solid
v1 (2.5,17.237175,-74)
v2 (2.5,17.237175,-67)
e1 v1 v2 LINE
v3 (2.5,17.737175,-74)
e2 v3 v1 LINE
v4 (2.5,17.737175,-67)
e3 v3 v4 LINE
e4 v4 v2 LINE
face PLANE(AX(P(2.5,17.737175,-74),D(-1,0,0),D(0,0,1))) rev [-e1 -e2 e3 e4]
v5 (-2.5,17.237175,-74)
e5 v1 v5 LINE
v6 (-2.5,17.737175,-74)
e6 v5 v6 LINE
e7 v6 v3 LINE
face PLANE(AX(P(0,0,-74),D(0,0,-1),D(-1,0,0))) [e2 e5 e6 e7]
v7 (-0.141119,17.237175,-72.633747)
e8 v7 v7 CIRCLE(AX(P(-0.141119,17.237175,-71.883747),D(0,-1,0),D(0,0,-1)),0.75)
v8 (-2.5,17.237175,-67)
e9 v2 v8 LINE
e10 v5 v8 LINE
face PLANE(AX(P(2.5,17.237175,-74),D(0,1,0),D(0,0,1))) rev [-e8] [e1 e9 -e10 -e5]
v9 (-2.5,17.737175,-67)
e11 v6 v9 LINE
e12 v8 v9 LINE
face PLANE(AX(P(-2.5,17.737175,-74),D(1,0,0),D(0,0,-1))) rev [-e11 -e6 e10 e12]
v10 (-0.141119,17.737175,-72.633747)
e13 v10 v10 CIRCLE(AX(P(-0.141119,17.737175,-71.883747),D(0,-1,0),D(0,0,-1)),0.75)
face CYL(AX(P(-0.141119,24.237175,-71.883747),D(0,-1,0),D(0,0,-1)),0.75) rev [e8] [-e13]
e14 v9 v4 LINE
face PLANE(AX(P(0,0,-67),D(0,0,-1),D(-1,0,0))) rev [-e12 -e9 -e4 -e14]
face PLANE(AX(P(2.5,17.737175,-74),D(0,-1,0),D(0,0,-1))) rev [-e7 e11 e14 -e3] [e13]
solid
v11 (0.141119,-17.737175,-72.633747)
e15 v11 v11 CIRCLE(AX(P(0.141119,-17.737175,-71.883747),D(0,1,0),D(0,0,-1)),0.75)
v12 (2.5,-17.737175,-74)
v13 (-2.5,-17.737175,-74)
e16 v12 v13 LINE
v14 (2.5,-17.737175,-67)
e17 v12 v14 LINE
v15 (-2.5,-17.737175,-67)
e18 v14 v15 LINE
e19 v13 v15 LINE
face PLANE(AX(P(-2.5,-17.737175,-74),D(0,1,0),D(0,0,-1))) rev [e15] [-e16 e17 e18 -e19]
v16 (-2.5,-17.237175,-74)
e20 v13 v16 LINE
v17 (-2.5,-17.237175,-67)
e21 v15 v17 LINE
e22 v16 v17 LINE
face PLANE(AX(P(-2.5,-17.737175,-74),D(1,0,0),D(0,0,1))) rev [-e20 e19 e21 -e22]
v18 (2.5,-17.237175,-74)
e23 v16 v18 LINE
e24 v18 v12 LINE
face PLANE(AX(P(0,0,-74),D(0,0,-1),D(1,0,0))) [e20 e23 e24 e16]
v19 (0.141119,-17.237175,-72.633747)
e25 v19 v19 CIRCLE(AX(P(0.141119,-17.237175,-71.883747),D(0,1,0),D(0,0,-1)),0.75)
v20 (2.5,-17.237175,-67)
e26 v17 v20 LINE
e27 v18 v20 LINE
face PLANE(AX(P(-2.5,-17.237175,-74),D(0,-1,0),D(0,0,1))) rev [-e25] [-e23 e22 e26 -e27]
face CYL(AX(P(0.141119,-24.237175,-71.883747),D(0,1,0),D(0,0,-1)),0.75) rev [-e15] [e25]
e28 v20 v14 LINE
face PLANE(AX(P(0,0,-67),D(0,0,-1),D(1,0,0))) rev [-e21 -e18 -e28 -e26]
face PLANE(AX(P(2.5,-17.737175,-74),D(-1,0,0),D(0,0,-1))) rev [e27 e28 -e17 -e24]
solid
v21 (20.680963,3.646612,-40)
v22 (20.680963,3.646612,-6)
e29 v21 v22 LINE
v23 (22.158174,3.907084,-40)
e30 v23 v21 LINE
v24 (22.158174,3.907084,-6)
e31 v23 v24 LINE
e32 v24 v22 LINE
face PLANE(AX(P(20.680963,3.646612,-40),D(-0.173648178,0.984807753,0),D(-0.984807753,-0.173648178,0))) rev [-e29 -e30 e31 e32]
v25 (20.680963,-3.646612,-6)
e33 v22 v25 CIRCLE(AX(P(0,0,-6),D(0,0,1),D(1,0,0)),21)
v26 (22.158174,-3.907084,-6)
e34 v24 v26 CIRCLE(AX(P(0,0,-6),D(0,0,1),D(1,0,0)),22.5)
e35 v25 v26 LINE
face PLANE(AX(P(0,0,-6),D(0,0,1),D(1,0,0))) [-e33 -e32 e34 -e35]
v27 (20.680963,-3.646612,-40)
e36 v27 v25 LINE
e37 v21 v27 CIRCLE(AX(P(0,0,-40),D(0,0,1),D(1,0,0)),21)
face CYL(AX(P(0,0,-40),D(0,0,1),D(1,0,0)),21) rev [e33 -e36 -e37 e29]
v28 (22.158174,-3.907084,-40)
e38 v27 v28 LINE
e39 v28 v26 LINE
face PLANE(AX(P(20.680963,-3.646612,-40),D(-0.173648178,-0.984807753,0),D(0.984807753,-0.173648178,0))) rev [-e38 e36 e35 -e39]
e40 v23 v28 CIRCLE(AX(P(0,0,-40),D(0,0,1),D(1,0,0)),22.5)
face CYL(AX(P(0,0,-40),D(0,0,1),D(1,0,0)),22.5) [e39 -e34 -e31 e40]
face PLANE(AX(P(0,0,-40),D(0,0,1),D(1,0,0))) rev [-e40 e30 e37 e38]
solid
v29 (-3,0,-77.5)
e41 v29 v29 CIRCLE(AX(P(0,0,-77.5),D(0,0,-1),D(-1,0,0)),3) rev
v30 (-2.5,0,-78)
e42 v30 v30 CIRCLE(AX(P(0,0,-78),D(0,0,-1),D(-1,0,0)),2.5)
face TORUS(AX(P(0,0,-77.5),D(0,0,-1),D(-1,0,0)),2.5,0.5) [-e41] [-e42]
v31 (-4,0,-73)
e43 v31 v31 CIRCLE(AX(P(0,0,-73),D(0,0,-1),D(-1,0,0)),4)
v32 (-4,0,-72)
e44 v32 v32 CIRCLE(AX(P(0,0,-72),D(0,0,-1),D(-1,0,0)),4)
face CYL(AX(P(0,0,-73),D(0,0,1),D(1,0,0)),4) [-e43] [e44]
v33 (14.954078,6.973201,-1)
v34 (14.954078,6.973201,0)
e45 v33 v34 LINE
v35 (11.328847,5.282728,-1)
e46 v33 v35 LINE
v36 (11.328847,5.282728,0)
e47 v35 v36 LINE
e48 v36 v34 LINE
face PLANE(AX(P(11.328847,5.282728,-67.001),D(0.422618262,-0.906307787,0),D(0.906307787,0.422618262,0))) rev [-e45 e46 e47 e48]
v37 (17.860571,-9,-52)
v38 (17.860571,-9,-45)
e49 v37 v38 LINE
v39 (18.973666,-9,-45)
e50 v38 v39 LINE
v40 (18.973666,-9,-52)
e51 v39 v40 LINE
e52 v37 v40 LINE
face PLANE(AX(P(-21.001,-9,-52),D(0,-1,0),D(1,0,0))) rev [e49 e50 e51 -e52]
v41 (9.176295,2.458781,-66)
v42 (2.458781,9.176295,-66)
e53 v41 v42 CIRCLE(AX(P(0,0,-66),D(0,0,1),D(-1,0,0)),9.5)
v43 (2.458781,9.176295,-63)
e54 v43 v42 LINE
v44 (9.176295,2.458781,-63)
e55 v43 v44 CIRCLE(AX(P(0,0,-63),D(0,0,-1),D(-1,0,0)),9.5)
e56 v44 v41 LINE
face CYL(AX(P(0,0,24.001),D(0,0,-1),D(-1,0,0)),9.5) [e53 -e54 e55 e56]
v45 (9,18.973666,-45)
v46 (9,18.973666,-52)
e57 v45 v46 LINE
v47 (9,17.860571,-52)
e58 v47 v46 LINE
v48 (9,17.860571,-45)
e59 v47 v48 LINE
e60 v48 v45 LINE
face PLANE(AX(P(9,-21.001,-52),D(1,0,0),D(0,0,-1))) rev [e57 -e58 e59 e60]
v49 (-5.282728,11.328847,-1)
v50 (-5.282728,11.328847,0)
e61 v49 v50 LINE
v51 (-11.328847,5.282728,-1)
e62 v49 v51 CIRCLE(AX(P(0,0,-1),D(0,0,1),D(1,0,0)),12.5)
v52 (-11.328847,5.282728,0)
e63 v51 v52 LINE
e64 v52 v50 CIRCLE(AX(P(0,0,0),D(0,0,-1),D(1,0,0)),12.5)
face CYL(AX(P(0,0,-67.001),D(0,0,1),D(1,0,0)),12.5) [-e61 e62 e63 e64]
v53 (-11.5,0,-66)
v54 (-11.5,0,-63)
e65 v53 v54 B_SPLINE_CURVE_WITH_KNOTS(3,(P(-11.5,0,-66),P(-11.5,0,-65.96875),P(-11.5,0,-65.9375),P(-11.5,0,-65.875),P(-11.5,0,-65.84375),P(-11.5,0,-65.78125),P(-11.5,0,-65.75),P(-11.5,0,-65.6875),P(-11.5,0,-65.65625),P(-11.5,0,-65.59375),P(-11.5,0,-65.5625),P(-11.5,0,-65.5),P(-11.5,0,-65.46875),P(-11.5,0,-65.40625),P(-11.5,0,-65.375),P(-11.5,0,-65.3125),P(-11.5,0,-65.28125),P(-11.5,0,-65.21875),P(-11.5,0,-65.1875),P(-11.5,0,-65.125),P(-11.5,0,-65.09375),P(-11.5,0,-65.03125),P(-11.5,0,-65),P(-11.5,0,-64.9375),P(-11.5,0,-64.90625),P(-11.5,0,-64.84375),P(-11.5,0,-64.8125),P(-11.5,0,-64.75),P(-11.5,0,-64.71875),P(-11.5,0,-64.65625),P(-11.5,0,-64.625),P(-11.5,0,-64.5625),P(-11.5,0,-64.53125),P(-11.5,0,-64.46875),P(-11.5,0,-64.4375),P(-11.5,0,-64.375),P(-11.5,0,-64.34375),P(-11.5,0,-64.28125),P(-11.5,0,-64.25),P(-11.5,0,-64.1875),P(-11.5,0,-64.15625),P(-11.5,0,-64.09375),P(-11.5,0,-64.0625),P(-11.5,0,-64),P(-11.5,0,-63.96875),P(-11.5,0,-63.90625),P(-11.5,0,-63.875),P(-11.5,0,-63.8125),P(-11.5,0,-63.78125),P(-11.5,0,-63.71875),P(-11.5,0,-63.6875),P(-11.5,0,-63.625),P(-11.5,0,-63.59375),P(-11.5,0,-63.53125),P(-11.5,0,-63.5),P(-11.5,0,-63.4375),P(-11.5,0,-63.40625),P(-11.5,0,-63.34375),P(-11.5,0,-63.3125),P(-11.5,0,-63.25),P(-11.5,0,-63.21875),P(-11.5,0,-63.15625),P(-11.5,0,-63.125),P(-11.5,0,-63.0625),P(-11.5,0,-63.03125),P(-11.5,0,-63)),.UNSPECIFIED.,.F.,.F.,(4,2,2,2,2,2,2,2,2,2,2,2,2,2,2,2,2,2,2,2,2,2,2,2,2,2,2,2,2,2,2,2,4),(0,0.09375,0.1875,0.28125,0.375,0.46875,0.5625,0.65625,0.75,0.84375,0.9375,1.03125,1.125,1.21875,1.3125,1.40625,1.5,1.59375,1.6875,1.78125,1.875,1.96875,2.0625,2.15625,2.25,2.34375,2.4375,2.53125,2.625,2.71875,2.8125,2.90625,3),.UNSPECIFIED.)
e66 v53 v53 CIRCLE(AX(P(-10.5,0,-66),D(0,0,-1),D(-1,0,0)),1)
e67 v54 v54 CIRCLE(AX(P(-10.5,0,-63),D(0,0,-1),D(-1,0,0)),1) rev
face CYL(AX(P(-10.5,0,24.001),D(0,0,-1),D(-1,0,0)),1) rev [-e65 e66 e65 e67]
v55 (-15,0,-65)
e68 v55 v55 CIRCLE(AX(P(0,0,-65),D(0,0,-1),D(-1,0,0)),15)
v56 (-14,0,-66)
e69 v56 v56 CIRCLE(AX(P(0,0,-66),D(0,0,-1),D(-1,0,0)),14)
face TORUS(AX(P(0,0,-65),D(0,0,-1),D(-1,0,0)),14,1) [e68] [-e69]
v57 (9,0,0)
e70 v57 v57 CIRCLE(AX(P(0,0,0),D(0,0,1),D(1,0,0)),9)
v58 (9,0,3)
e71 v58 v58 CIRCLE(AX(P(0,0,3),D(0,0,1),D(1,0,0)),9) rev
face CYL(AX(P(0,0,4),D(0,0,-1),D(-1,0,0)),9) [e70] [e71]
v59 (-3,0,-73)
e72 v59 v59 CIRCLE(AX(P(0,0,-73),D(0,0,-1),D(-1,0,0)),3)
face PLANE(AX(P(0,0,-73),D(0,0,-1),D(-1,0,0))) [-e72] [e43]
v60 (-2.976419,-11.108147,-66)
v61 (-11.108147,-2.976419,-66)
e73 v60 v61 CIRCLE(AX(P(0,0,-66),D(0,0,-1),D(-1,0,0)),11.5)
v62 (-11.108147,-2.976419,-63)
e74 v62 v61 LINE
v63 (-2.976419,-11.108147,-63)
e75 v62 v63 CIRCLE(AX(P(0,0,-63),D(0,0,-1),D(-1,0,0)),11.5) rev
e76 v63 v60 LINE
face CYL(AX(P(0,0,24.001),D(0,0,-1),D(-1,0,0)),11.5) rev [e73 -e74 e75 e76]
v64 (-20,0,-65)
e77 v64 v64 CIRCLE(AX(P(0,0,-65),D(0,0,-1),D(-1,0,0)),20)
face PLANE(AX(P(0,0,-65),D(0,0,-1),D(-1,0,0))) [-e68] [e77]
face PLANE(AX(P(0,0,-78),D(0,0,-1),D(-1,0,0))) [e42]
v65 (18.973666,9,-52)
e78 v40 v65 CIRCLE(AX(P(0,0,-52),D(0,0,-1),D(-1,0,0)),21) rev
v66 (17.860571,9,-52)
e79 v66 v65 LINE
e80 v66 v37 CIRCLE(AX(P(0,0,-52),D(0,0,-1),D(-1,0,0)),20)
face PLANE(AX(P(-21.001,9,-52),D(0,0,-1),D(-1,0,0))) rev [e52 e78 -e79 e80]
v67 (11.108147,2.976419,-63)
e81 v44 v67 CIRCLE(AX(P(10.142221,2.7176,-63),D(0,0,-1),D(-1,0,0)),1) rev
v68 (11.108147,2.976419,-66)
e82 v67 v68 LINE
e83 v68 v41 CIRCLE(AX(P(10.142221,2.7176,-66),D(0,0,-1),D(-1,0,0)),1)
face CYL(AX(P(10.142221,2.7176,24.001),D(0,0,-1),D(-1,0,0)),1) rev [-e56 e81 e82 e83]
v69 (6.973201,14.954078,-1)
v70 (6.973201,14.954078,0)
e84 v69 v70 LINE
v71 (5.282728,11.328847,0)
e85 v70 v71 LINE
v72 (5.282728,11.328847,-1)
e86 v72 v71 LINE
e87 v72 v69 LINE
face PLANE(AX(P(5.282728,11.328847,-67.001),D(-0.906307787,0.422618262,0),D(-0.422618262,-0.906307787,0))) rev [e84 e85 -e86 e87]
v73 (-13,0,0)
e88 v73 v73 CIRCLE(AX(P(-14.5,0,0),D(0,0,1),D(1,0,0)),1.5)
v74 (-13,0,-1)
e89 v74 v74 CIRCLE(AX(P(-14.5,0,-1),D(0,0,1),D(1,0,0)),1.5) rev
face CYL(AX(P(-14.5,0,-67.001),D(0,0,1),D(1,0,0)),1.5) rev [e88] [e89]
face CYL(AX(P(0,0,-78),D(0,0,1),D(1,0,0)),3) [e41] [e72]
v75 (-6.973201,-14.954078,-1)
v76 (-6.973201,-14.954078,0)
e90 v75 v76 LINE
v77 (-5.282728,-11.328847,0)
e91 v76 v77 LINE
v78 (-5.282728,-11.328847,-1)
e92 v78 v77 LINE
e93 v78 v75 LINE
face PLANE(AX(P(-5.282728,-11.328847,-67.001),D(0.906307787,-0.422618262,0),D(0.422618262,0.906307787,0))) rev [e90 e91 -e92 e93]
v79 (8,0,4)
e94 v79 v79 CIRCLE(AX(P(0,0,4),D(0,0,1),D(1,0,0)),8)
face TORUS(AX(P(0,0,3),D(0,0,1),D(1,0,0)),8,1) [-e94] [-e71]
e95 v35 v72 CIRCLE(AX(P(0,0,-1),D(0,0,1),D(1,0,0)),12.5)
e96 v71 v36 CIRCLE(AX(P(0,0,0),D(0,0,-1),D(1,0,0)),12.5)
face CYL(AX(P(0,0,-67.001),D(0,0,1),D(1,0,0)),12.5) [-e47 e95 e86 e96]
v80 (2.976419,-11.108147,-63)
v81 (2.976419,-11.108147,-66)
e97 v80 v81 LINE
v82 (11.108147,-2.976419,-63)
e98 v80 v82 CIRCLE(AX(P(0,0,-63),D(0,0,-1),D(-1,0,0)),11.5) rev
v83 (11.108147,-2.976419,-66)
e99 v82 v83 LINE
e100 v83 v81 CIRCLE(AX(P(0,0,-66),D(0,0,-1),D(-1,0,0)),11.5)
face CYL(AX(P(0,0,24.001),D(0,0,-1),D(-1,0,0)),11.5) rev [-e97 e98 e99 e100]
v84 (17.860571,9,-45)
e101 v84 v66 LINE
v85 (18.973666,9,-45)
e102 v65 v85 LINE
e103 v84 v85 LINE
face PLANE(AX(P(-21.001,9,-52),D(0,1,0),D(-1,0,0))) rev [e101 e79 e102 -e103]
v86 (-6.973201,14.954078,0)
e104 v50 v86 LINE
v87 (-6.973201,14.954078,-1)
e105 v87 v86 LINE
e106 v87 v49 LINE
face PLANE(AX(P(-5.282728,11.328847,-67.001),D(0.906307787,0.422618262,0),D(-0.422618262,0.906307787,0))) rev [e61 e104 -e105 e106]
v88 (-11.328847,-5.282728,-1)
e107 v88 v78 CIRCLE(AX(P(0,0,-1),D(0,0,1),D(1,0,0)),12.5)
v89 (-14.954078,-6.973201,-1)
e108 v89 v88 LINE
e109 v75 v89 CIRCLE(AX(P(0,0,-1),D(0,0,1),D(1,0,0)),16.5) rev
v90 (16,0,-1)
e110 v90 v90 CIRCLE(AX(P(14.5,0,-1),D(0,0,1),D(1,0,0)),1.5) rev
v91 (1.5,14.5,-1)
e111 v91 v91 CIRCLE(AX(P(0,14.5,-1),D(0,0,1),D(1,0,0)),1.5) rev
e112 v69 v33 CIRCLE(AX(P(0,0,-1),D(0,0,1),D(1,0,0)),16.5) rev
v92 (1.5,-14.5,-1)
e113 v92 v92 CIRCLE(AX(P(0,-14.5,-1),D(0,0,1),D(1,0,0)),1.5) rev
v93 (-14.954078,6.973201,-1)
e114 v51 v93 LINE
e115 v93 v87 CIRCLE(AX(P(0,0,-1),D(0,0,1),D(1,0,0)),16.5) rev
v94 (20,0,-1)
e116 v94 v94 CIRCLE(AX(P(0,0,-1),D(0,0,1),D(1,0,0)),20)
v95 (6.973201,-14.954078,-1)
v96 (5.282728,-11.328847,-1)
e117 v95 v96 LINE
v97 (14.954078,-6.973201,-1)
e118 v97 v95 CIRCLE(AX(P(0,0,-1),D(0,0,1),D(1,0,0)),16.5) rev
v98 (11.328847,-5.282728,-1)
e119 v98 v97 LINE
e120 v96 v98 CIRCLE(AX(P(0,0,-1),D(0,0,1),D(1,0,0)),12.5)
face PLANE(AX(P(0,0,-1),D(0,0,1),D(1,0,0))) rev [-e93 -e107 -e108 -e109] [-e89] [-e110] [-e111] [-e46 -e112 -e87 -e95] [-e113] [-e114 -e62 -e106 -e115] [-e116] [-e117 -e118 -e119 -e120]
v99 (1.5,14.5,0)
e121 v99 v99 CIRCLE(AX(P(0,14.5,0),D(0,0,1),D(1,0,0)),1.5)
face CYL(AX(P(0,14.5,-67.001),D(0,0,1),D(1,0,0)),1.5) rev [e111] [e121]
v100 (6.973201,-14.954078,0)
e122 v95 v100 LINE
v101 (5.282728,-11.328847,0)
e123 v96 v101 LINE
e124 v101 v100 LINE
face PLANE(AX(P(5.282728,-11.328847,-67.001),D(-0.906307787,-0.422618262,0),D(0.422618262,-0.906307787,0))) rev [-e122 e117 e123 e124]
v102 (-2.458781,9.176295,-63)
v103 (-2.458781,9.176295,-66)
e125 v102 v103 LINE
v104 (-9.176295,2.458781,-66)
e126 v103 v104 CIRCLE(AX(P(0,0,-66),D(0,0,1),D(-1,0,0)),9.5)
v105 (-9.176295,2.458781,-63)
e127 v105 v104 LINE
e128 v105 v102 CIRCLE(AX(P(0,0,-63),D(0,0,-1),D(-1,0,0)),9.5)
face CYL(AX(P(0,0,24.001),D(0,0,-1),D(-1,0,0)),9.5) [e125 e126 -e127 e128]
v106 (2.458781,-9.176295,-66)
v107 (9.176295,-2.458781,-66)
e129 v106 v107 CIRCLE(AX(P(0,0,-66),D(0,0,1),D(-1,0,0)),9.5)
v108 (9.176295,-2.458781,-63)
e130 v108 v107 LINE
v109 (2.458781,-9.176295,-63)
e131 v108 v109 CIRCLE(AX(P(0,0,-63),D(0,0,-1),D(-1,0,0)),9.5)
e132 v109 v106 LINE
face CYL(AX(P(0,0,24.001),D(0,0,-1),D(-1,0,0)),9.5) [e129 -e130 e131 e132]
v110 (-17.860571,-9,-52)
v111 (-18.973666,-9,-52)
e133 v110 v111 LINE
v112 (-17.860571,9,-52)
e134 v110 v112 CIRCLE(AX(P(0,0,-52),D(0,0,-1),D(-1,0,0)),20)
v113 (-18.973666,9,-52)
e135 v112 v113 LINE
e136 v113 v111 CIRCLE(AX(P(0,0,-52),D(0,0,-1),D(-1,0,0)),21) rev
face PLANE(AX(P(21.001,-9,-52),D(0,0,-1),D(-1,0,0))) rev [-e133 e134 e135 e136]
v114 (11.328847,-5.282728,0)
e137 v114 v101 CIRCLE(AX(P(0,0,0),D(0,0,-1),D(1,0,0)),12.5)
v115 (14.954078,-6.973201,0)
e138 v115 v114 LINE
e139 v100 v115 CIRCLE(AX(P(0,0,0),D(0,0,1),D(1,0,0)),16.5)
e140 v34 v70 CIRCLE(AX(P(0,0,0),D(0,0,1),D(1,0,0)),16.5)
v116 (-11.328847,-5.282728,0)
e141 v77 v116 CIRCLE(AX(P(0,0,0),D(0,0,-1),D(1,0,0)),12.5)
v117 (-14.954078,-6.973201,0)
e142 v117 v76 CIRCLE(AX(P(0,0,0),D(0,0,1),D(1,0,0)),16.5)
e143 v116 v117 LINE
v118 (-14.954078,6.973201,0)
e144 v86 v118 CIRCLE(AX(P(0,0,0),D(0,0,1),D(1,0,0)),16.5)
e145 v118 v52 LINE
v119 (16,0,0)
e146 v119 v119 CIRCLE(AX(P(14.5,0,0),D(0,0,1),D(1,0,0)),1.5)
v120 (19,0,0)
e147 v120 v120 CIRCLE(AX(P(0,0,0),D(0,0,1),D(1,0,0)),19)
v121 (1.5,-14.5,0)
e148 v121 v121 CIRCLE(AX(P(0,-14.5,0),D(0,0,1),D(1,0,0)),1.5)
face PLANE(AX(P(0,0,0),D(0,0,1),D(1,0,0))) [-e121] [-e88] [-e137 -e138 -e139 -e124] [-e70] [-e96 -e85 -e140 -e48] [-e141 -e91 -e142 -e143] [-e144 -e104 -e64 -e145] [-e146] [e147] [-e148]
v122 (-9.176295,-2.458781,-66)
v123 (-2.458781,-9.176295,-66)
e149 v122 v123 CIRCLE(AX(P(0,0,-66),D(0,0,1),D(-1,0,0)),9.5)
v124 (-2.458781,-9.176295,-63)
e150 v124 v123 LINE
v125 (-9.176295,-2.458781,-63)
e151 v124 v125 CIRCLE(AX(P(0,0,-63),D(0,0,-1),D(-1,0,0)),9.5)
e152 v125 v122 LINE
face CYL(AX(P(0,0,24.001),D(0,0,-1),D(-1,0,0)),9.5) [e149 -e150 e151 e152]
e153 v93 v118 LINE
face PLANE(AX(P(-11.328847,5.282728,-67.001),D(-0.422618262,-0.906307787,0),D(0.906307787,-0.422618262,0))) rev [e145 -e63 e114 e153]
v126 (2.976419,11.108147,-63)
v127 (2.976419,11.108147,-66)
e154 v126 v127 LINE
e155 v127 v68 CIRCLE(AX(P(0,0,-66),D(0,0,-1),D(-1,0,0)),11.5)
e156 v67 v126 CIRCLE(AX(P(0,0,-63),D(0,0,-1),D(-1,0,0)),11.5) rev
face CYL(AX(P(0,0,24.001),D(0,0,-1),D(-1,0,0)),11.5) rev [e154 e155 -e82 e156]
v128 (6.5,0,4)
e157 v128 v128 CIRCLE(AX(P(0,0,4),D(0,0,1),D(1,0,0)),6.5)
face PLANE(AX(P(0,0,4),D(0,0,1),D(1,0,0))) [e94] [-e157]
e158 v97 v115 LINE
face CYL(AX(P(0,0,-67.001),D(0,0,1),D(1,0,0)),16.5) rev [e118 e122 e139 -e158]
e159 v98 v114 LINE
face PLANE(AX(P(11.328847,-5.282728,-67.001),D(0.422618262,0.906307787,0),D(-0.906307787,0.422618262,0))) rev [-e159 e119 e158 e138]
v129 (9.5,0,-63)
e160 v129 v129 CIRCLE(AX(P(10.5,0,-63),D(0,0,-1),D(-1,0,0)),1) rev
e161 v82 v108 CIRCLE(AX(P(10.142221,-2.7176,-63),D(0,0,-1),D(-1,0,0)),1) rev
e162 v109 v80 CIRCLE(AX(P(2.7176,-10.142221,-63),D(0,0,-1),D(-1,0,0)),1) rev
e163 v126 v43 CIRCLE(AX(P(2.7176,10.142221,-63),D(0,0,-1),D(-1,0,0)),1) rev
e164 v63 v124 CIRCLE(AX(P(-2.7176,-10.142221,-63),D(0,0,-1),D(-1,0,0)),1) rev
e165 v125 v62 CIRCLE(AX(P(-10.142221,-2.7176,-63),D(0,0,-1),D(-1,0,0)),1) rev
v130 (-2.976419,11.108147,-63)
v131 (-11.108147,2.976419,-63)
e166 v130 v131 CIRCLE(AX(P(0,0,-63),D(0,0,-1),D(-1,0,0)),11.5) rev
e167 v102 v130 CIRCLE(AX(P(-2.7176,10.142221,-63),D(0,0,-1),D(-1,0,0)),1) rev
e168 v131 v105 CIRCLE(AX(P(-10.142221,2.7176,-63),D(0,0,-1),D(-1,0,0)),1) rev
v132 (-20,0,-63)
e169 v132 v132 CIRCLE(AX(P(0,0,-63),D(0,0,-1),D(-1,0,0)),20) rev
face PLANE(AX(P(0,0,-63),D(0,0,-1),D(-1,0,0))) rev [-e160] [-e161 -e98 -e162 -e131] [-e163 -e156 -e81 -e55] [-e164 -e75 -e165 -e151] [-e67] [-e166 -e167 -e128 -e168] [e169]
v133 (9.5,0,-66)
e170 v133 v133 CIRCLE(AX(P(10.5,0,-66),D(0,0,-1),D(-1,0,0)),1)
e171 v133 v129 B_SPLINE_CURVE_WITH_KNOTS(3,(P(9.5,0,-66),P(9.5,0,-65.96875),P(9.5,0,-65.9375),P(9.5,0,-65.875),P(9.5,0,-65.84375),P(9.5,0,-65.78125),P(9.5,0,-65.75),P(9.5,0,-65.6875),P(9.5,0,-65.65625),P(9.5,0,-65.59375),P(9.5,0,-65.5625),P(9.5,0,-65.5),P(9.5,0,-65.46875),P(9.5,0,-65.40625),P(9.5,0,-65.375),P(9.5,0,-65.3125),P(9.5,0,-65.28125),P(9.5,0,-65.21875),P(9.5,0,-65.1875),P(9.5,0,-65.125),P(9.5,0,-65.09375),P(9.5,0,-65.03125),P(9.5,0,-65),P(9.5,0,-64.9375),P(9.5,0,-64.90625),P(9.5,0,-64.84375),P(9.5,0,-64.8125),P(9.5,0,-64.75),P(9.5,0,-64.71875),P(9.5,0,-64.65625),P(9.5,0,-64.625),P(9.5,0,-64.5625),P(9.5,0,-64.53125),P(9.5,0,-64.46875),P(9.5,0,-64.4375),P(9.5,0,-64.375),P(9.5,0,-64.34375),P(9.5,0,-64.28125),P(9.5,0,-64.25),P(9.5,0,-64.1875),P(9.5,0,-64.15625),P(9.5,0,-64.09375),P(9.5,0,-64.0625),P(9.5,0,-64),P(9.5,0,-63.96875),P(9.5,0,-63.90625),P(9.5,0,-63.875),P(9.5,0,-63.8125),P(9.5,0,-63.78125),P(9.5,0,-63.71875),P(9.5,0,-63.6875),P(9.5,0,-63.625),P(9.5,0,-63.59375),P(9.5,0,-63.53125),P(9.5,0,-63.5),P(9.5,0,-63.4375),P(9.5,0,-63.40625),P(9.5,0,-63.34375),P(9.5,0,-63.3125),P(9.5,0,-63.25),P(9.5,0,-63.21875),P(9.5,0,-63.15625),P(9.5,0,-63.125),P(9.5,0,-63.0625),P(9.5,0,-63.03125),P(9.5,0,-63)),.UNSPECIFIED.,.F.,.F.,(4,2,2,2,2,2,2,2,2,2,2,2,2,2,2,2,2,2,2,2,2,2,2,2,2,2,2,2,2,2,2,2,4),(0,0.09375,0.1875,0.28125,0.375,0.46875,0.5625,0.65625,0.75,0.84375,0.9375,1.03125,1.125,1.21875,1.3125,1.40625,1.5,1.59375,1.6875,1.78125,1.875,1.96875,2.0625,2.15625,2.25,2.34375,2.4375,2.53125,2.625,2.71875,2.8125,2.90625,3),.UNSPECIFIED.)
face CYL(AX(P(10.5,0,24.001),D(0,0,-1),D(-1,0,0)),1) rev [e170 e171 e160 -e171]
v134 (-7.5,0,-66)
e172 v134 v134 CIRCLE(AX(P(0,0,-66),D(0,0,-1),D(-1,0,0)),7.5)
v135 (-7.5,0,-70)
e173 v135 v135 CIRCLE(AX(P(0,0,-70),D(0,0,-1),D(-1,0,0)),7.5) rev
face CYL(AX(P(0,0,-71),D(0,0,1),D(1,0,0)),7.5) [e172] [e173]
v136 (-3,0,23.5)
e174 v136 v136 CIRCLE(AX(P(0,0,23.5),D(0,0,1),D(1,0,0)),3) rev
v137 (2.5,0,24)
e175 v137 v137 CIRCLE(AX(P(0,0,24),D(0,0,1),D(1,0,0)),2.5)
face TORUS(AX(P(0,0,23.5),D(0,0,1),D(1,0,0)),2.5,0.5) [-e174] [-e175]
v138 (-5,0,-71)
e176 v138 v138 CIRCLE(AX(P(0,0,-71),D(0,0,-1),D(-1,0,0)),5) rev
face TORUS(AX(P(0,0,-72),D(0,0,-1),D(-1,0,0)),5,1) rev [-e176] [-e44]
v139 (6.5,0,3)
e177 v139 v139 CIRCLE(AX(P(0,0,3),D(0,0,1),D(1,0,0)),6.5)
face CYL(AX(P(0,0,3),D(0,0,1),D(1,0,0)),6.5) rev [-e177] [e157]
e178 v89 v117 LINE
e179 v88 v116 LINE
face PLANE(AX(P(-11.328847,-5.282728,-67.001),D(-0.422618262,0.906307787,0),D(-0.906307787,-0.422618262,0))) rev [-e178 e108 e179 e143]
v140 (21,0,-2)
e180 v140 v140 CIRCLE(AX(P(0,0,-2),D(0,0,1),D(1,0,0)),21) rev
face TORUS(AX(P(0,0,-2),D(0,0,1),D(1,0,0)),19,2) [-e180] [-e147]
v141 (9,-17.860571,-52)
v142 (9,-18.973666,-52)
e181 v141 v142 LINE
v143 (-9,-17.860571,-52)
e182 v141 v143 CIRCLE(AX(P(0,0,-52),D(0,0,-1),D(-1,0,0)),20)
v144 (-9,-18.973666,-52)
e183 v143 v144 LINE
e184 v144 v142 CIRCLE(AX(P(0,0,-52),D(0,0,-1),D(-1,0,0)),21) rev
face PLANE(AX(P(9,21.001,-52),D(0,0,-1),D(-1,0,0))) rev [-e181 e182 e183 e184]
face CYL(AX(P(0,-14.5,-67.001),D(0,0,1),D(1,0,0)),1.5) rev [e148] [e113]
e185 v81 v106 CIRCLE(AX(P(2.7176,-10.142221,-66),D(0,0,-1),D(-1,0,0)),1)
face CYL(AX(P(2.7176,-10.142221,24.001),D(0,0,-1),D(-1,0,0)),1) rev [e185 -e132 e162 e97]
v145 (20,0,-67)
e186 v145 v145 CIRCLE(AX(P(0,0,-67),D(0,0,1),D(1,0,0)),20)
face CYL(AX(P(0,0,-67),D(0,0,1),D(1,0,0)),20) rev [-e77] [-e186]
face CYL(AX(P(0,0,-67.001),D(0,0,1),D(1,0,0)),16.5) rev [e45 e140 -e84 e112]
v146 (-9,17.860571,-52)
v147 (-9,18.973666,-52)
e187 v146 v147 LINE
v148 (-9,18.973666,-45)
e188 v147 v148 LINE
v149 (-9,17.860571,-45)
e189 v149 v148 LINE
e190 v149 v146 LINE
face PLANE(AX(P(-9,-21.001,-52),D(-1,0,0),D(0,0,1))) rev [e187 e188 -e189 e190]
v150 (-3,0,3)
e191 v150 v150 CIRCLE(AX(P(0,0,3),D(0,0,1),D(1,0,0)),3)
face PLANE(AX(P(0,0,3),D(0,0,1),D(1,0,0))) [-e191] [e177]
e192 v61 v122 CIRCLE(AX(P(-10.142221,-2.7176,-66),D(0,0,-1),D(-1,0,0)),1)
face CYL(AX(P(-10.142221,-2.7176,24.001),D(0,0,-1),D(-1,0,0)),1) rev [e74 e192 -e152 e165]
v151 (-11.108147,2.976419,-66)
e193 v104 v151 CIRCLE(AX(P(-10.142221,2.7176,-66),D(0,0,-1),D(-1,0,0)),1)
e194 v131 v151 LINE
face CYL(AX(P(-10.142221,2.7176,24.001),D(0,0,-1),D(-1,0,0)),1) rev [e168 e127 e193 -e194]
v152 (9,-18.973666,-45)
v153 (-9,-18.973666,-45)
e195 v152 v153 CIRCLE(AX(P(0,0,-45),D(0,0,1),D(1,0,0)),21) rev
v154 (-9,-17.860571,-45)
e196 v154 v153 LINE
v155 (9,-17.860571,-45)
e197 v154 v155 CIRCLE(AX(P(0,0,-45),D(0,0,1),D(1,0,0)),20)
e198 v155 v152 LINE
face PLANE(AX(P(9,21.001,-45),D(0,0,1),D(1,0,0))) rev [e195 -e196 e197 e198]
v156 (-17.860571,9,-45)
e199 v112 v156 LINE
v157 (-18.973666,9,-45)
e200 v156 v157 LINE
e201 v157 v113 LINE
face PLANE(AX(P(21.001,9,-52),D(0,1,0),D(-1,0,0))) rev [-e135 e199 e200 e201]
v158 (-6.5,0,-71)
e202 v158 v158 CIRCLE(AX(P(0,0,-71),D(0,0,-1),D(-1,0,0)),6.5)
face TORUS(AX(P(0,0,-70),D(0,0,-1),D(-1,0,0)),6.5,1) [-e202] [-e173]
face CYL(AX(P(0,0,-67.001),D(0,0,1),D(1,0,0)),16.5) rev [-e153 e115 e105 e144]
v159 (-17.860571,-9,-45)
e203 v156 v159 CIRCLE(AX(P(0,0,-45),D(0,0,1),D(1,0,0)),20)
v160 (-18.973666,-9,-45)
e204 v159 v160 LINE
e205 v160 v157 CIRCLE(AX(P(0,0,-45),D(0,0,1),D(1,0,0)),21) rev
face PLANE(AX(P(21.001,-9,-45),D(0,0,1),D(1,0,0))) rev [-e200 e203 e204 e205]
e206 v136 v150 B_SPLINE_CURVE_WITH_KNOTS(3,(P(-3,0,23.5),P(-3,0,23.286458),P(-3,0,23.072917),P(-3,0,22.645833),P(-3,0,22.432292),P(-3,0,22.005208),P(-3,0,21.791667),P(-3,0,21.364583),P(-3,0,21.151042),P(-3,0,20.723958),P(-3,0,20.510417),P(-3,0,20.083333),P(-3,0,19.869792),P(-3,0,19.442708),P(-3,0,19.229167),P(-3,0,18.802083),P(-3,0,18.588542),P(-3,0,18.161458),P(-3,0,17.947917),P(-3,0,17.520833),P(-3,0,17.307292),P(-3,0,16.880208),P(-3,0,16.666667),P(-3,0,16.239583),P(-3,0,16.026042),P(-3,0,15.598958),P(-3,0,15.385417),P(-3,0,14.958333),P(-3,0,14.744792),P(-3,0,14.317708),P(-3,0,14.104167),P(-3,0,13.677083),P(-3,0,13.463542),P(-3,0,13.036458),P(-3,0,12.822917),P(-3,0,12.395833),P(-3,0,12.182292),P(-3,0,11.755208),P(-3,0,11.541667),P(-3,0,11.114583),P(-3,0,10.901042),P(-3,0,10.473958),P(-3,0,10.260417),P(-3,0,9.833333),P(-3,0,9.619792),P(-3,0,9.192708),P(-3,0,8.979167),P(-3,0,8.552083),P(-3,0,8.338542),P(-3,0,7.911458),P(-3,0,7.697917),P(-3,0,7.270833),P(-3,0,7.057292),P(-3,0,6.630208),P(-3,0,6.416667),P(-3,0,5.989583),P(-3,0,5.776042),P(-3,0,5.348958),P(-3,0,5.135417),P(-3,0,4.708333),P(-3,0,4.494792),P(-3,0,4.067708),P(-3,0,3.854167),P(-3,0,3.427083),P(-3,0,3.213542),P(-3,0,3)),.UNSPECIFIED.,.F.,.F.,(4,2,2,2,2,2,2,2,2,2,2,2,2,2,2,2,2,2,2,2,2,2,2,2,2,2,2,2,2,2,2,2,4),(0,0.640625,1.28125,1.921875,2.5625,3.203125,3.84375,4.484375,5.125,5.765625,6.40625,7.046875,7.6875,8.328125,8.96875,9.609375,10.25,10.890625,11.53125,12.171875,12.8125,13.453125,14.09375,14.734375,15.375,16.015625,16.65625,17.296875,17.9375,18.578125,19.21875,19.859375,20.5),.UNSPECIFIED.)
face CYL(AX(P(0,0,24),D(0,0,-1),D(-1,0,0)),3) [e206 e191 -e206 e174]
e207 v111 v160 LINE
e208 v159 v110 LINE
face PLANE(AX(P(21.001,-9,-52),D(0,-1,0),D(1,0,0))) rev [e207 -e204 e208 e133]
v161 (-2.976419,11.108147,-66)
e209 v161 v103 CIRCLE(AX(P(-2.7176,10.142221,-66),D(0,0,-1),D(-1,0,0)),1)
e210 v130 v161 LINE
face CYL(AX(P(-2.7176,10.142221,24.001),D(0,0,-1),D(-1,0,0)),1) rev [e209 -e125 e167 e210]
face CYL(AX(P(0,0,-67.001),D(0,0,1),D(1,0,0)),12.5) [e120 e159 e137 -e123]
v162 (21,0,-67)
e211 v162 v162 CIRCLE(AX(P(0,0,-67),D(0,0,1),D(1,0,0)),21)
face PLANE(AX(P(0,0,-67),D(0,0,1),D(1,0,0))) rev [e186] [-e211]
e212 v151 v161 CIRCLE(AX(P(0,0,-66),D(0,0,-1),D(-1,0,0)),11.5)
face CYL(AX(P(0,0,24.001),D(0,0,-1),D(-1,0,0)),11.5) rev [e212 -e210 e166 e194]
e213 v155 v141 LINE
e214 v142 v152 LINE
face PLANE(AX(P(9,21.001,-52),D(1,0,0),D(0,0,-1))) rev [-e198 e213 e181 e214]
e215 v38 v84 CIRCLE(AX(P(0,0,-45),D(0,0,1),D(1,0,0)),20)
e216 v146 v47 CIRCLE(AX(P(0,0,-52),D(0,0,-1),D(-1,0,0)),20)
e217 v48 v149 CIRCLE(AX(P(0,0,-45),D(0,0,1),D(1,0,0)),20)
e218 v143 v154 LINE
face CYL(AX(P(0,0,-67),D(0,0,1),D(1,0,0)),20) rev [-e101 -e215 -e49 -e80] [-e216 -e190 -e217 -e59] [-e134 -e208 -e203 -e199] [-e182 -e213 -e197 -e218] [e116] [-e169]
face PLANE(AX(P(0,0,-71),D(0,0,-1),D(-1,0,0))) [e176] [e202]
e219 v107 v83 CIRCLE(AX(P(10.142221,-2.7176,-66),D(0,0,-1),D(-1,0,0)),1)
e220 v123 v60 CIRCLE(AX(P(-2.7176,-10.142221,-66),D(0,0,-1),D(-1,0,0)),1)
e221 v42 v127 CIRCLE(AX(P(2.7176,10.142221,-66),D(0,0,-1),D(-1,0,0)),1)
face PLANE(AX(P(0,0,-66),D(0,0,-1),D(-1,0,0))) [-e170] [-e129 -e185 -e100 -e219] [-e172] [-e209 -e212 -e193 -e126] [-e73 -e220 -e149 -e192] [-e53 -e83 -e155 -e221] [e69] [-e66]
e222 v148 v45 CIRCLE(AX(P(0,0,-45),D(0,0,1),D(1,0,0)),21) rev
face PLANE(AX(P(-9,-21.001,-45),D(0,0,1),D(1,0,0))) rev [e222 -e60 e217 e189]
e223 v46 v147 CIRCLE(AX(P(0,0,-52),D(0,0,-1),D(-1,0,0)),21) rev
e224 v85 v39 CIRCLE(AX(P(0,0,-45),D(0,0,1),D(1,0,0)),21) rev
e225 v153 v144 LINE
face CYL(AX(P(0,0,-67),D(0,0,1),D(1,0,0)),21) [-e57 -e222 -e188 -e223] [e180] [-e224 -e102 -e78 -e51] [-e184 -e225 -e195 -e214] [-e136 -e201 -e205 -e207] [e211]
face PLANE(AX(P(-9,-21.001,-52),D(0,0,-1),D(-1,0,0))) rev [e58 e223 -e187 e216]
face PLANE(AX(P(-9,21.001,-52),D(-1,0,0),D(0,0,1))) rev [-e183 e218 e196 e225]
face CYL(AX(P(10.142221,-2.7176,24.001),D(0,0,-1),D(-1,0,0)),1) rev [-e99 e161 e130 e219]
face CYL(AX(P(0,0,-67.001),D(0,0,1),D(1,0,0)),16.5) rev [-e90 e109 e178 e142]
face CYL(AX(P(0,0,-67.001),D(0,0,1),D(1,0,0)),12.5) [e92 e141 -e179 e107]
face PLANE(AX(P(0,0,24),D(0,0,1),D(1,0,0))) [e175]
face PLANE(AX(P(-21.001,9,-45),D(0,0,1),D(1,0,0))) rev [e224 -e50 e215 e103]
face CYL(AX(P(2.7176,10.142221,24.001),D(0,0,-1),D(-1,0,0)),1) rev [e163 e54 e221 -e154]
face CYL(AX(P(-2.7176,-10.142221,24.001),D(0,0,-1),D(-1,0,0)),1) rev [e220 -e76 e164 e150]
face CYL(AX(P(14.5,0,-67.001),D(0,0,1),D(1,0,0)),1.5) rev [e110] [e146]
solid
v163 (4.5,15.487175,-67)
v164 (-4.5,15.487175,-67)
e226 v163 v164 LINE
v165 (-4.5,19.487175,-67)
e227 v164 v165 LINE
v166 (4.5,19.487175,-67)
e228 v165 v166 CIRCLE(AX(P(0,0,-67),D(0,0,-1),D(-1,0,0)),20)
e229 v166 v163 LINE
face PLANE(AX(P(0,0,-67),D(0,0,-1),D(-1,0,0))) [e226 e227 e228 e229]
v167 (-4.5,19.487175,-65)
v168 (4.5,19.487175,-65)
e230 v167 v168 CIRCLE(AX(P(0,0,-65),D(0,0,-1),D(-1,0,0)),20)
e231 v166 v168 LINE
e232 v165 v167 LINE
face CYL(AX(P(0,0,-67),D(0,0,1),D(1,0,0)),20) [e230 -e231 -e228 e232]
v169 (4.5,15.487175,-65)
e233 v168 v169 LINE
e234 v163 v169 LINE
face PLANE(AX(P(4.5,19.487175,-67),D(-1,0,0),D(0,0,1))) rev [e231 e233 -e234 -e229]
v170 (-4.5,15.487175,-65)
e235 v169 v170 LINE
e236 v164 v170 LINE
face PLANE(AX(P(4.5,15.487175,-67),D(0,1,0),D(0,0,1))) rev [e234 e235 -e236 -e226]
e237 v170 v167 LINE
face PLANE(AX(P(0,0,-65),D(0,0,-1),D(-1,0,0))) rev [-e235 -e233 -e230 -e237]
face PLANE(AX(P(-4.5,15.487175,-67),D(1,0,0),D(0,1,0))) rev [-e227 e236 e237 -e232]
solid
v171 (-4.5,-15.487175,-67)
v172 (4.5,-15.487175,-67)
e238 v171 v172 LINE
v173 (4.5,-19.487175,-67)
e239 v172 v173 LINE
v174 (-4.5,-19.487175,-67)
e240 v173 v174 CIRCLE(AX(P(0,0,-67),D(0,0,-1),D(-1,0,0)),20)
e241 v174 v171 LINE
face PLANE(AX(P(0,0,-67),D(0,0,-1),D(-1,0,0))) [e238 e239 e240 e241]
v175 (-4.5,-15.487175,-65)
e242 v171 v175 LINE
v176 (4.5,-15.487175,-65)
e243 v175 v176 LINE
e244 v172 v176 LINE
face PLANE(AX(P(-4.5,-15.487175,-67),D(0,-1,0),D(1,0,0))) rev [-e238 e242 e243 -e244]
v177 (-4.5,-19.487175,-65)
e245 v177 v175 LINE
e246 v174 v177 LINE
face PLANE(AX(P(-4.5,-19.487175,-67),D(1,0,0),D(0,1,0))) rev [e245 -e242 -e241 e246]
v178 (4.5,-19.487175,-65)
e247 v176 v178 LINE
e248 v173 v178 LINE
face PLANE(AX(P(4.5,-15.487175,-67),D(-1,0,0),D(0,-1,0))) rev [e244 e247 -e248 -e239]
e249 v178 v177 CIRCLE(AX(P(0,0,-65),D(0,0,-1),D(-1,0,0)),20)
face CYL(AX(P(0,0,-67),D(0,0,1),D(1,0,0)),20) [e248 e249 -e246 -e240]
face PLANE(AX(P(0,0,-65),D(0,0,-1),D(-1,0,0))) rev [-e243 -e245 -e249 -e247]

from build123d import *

# Parameters (mm, degrees)
SKETCH1_R               = 21
BOSS_EXTRUDE1_DEPTH     = 67
SHELL1_T                = -1
FILLET1_R               = 2
CUT_EXTRUDE1_REACH      = 75.287
SKETCH2_R               = 1.5
SKETCH3_R               = 9
BOSS_EXTRUDE2_DEPTH     = 4
FILLET2_R               = 1
SKETCH4_R               = 6.5
CUT_EXTRUDE2_DEPTH      = 1
SKETCH5_R               = 3
BOSS_EXTRUDE3_DEPTH     = 21
FILLET3_R               = 0.5
CUT_EXTRUDE3_REACH      = 83.817
CUT_EXTRUDE3_END_RADIUS = 20
SKETCH6_W               = 18
SKETCH6_H               = 7
CIRPATTERN1_COUNT       = 4
BOSS_EXTRUDE4_START     = -6
SKETCH7_R               = 22.5
SKETCH7_R_2             = 21
BOSS_EXTRUDE4_DEPTH     = 34
CUT_EXTRUDE4_DEPTH      = 34
BOSS_EXTRUDE5_START     = -2
SKETCH10_R              = 20
BOSS_EXTRUDE5_DEPTH     = 2
SKETCH11_R              = 15
BOSS_EXTRUDE6_DEPTH     = 1
FILLET4_R               = 1
SKETCH12_R              = 7.5
BOSS_EXTRUDE7_DEPTH     = 5
SKETCH13_R              = 4
BOSS_EXTRUDE8_DEPTH     = 2
BOSS_EXTRUDE9_START     = 5
SKETCH14_R              = 3
BOSS_EXTRUDE9_DEPTH     = 5
FILLET5_R               = 0.5
FILLET6_R               = 1
FILLET7_R               = 1
SKETCH15_R              = 1
CUT_EXTRUDE5_DEPTH      = 3
BOSS_EXTRUDE10_DEPTH    = 2
BOSS_EXTRUDE10_2_DEPTH  = 2
SKETCH17_W              = 5
SKETCH17_H              = 0.5
BOSS_EXTRUDE11_DEPTH    = 7
SKETCH18_R              = 0.75
CUT_EXTRUDE6_DEPTH      = 7
CIRPATTERN2_COUNT       = 2


with BuildPart() as part:
    # Sketch1 → Boss-Extrude1 (new body)
    with BuildSketch(Plane.XY):
        Circle(SKETCH1_R)
    extrude(amount=-BOSS_EXTRUDE1_DEPTH)

    # Shell1
    shell1_openings = [part.faces().sort_by_distance(p)[0] for p in [
        (0, 0, -67),
    ]]
    offset(amount=SHELL1_T, openings=shell1_openings, kind=Kind.INTERSECTION)

    # Fillet1
    fillet1_edges = [part.edges().sort_by_distance(p)[0] for p in [
        (-21, 0, 0),
    ]]
    fillet(fillet1_edges, radius=FILLET1_R)

    # Sketch2 → Cut-Extrude1 (cut, up to next)
    with BuildSketch(Plane.XY, mode=Mode.PRIVATE) as cut_extrude1_sk1:
        with Locations((14.5, 0)):
            Circle(SKETCH2_R)
    cut_extrude1_tool1 = extrude(cut_extrude1_sk1.sketch, amount=-CUT_EXTRUDE1_REACH, mode=Mode.PRIVATE) & part.part
    # Sketch2 → Cut-Extrude1 (cut, up to next)
    with BuildSketch(Plane.XY, mode=Mode.PRIVATE) as cut_extrude1_sk2:
        with Locations((0, -14.5)):
            Circle(SKETCH2_R)
    cut_extrude1_tool2 = extrude(cut_extrude1_sk2.sketch, amount=-CUT_EXTRUDE1_REACH, mode=Mode.PRIVATE) & part.part
    # Sketch2 → Cut-Extrude1 (cut, up to next)
    with BuildSketch(Plane.XY, mode=Mode.PRIVATE) as cut_extrude1_sk3:
        with Locations((-14.5, 0)):
            Circle(SKETCH2_R)
    cut_extrude1_tool3 = extrude(cut_extrude1_sk3.sketch, amount=-CUT_EXTRUDE1_REACH, mode=Mode.PRIVATE) & part.part
    # Sketch2 → Cut-Extrude1 (cut, up to next)
    with BuildSketch(Plane.XY, mode=Mode.PRIVATE) as cut_extrude1_sk4:
        with Locations((0, 14.5)):
            Circle(SKETCH2_R)
    cut_extrude1_tool4 = extrude(cut_extrude1_sk4.sketch, amount=-CUT_EXTRUDE1_REACH, mode=Mode.PRIVATE) & part.part
    # Sketch2 → Cut-Extrude1 (cut, up to next)
    with BuildSketch(Plane.XY, mode=Mode.PRIVATE) as cut_extrude1_sk5:
        with BuildLine():
            Line((11.328847338, 5.282728272), (14.954078486, 6.973201319))
            ThreePointArc((14.954078486, 6.973201319), (11.66726189, 11.66726189), (6.973201319, 14.954078486))
            Line((6.973201319, 14.954078486), (5.282728272, 11.328847338))
            ThreePointArc((5.282728272, 11.328847338), (8.838834765, 8.838834765), (11.328847338, 5.282728272))
        make_face()
    cut_extrude1_tool5 = extrude(cut_extrude1_sk5.sketch, amount=-CUT_EXTRUDE1_REACH, mode=Mode.PRIVATE) & part.part
    # Sketch2 → Cut-Extrude1 (cut, up to next)
    with BuildSketch(Plane.XY, mode=Mode.PRIVATE) as cut_extrude1_sk6:
        with BuildLine():
            Line((11.328847338, -5.282728272), (14.954078486, -6.973201319))
            ThreePointArc((14.954078486, -6.973201319), (11.66726189, -11.66726189), (6.973201319, -14.954078486))
            Line((6.973201319, -14.954078486), (5.282728272, -11.328847338))
            ThreePointArc((5.282728272, -11.328847338), (8.838834765, -8.838834765), (11.328847338, -5.282728272))
        make_face()
    cut_extrude1_tool6 = extrude(cut_extrude1_sk6.sketch, amount=-CUT_EXTRUDE1_REACH, mode=Mode.PRIVATE) & part.part
    # Sketch2 → Cut-Extrude1 (cut, up to next)
    with BuildSketch(Plane.XY, mode=Mode.PRIVATE) as cut_extrude1_sk7:
        with BuildLine():
            Line((-5.282728272, -11.328847338), (-6.973201319, -14.954078486))
            ThreePointArc((-6.973201319, -14.954078486), (-11.66726189, -11.66726189), (-14.954078486, -6.973201319))
            Line((-14.954078486, -6.973201319), (-11.328847338, -5.282728272))
            ThreePointArc((-11.328847338, -5.282728272), (-8.838834765, -8.838834765), (-5.282728272, -11.328847338))
        make_face()
    cut_extrude1_tool7 = extrude(cut_extrude1_sk7.sketch, amount=-CUT_EXTRUDE1_REACH, mode=Mode.PRIVATE) & part.part
    # Sketch2 → Cut-Extrude1 (cut, up to next)
    with BuildSketch(Plane.XY, mode=Mode.PRIVATE) as cut_extrude1_sk8:
        with BuildLine():
            Line((-11.328847338, 5.282728272), (-14.954078486, 6.973201319))
            ThreePointArc((-14.954078486, 6.973201319), (-11.66726189, 11.66726189), (-6.973201319, 14.954078486))
            Line((-6.973201319, 14.954078486), (-5.282728272, 11.328847338))
            ThreePointArc((-5.282728272, 11.328847338), (-8.838834765, 8.838834765), (-11.328847338, 5.282728272))
        make_face()
    cut_extrude1_tool8 = extrude(cut_extrude1_sk8.sketch, amount=-CUT_EXTRUDE1_REACH, mode=Mode.PRIVATE) & part.part
    add(cut_extrude1_tool1.solids().sort_by_distance((14.5, 0, 0))[0], mode=Mode.SUBTRACT)
    add(cut_extrude1_tool2.solids().sort_by_distance((0, -14.5, 0))[0], mode=Mode.SUBTRACT)
    add(cut_extrude1_tool3.solids().sort_by_distance((-14.5, 0, 0))[0], mode=Mode.SUBTRACT)
    add(cut_extrude1_tool4.solids().sort_by_distance((0, 14.5, 0))[0], mode=Mode.SUBTRACT)
    add(cut_extrude1_tool5.solids().sort_by_distance((10.109805, 10.109805, 0))[0], mode=Mode.SUBTRACT)
    add(cut_extrude1_tool6.solids().sort_by_distance((10.109805, -10.109805, 0))[0], mode=Mode.SUBTRACT)
    add(cut_extrude1_tool7.solids().sort_by_distance((-10.109805, -10.109805, 0))[0], mode=Mode.SUBTRACT)
    add(cut_extrude1_tool8.solids().sort_by_distance((-10.109805, 10.109805, 0))[0], mode=Mode.SUBTRACT)

    # Sketch3 → Boss-Extrude2 (add)
    with BuildSketch(Plane.XY):
        Circle(SKETCH3_R)
    extrude(amount=BOSS_EXTRUDE2_DEPTH)

    # Fillet2
    fillet2_edges = [part.edges().sort_by_distance(p)[0] for p in [
        (-9, 0, 4),
    ]]
    fillet(fillet2_edges, radius=FILLET2_R)

    # Sketch4 → Cut-Extrude2 (cut)
    with BuildSketch(Plane.XY.offset(4)):
        Circle(SKETCH4_R)
    extrude(amount=-CUT_EXTRUDE2_DEPTH, mode=Mode.SUBTRACT)

    # Sketch5 → Boss-Extrude3 (add)
    with BuildSketch(Plane.XY.offset(3)):
        with Locations(Location((0, 0, 0), (0, 0, 180))):
            Circle(SKETCH5_R)
    extrude(amount=BOSS_EXTRUDE3_DEPTH)

    # Fillet3
    fillet3_edges = [part.edges().sort_by_distance(p)[0] for p in [
        (3, 0, 24),
    ]]
    fillet(fillet3_edges, radius=FILLET3_R)

    # Cut-Extrude3: up to this cylinder (the profile starts outside it)
    cut_extrude3_end = Plane(origin=(0, 0, -48.5), z_dir=(0, 0, 1)) * Cylinder(CUT_EXTRUDE3_END_RADIUS, 208.634, mode=Mode.PRIVATE)
    # Sketch6 → Cut-Extrude3 (cut, up to the surface)
    with BuildSketch(Plane(origin=(0, 21, 0), x_dir=(1, 0, 0), z_dir=(0, 1, 0)), mode=Mode.PRIVATE) as cut_extrude3_sk1:
        with Locations((0, 48.5)):
            Rectangle(SKETCH6_W, SKETCH6_H)
    cut_extrude3_tool1 = extrude(cut_extrude3_sk1.sketch, amount=-CUT_EXTRUDE3_REACH, mode=Mode.PRIVATE) - cut_extrude3_end
    cut_extrude3 = cut_extrude3_tool1.solids().sort_by_distance((0, 21, -48.5))[0]
    add(cut_extrude3, mode=Mode.SUBTRACT)

    # CirPattern1: Cut-Extrude3 ×4 about axis
    cirpattern1_axis = Axis((0, 0, 0), (0, 0, 1))
    for i in range(1, CIRPATTERN1_COUNT):
        add(cut_extrude3.rotate(cirpattern1_axis, i * 360 / CIRPATTERN1_COUNT), mode=Mode.SUBTRACT)



with BuildPart() as body_2:
    # Sketch7 → Boss-Extrude4 (new body)
    with BuildSketch(Plane.XY.offset(BOSS_EXTRUDE4_START)):
        Circle(SKETCH7_R)
        Circle(SKETCH7_R_2, mode=Mode.SUBTRACT)
    extrude(amount=-BOSS_EXTRUDE4_DEPTH)

    # Sketch9 → Cut-Extrude4 (cut)
    with BuildSketch(Plane.XY.offset(-6)):
        with BuildLine():
            Line((20.680962813, 3.646611731), (22.158174443, 3.907083998))
            ThreePointArc((22.158174443, 3.907083998), (22.5, 0), (22.158174443, -3.907083998))
            Line((22.158174443, -3.907083998), (20.680962813, -3.646611731))
            ThreePointArc((20.680962813, -3.646611731), (21, 0), (20.680962813, 3.646611731))
        make_face()
    extrude(amount=-CUT_EXTRUDE4_DEPTH, mode=Mode.SUBTRACT)


with BuildPart() as body_3:
    # Sketch10 → Boss-Extrude5 (new body)
    with BuildSketch(Plane(origin=(0, 0, -67), x_dir=(-1, 0, 0), z_dir=(0, 0, -1)).offset(BOSS_EXTRUDE5_START)):
        with Locations(Location((0, 0, 0), (0, 0, 180))):
            Circle(SKETCH10_R)
    extrude(amount=-BOSS_EXTRUDE5_DEPTH)


with BuildPart() as part_1:
    add(part.part)

    add(body_3.part)  # Boss-Extrude6 merges body 3
    # Sketch11 → Boss-Extrude6 (add)
    with BuildSketch(Plane(origin=(0, 0, -65), x_dir=(-1, 0, 0), z_dir=(0, 0, -1))):
        Circle(SKETCH11_R)
    extrude(amount=BOSS_EXTRUDE6_DEPTH)

    # Fillet4
    fillet4_edges = [part_1.edges().sort_by_distance(p)[0] for p in [
        (15, 0, -66),
    ]]
    fillet(fillet4_edges, radius=FILLET4_R - 0.0001)  # a hair under: the kernel refuses the full size

    # Sketch12 → Boss-Extrude7 (add)
    with BuildSketch(Plane(origin=(0, 0, -66), x_dir=(-1, 0, 0), z_dir=(0, 0, -1))):
        Circle(SKETCH12_R)
    extrude(amount=BOSS_EXTRUDE7_DEPTH)

    # Sketch13 → Boss-Extrude8 (add)
    with BuildSketch(Plane(origin=(0, 0, -71), x_dir=(-1, 0, 0), z_dir=(0, 0, -1))):
        Circle(SKETCH13_R)
    extrude(amount=BOSS_EXTRUDE8_DEPTH)

    # Sketch14 → Boss-Extrude9 (add)
    with BuildSketch(Plane(origin=(0, 0, -73), x_dir=(-1, 0, 0), z_dir=(0, 0, -1)).offset(BOSS_EXTRUDE9_START)):
        Circle(SKETCH14_R)
    extrude(amount=-BOSS_EXTRUDE9_DEPTH)

    # Fillet5
    fillet5_edges = [part_1.edges().sort_by_distance(p)[0] for p in [
        (3, 0, -78),
    ]]
    fillet(fillet5_edges, radius=FILLET5_R)

    # Fillet6
    fillet6_edges = [part_1.edges().sort_by_distance(p)[0] for p in [
        (4, 0, -71),
    ]]
    fillet(fillet6_edges, radius=FILLET6_R)

    # Fillet7
    fillet7_edges = [part_1.edges().sort_by_distance(p)[0] for p in [
        (7.5, 0, -71),
    ]]
    fillet(fillet7_edges, radius=FILLET7_R)

    # Sketch15 → Cut-Extrude5 (cut)
    with BuildSketch(Plane(origin=(0, 0, -66), x_dir=(-1, 0, 0), z_dir=(0, 0, -1))):
        with Locations((10.5, 0)):
            Circle(SKETCH15_R)
        with Locations((-10.5, 0)):
            Circle(SKETCH15_R)
        with BuildLine():
            ThreePointArc((11.108147002, 2.976419019), (8.131727984, 8.131727984), (2.976419019, 11.108147002))
            ThreePointArc((2.976419019, 11.108147002), (1.751674147, 10.401040221), (2.458780928, 9.17629535))
            ThreePointArc((2.458780928, 9.17629535), (6.717514421, 6.717514421), (9.17629535, 2.458780928))
            ThreePointArc((9.17629535, 2.458780928), (10.401040221, 1.751674147), (11.108147002, 2.976419019))
        make_face()
        with BuildLine():
            ThreePointArc((2.976419019, -11.108147002), (8.131727984, -8.131727984), (11.108147002, -2.976419019))
            ThreePointArc((11.108147002, -2.976419019), (10.401040221, -1.751674147), (9.17629535, -2.458780928))
            ThreePointArc((9.17629535, -2.458780928), (6.717514421, -6.717514421), (2.458780928, -9.17629535))
            ThreePointArc((2.458780928, -9.17629535), (1.751674147, -10.401040221), (2.976419019, -11.108147002))
        make_face()
        with BuildLine():
            ThreePointArc((-11.108147002, -2.976419019), (-8.131727984, -8.131727984), (-2.976419019, -11.108147002))
            ThreePointArc((-2.976419019, -11.108147002), (-1.751674147, -10.401040221), (-2.458780928, -9.17629535))
            ThreePointArc((-2.458780928, -9.17629535), (-6.717514421, -6.717514421), (-9.17629535, -2.458780928))
            ThreePointArc((-9.17629535, -2.458780928), (-10.401040221, -1.751674147), (-11.108147002, -2.976419019))
        make_face()
        with BuildLine():
            ThreePointArc((-2.976419019, 11.108147002), (-8.131727984, 8.131727984), (-11.108147002, 2.976419019))
            ThreePointArc((-11.108147002, 2.976419019), (-10.401040221, 1.751674147), (-9.17629535, 2.458780928))
            ThreePointArc((-9.17629535, 2.458780928), (-6.717514421, 6.717514421), (-2.458780928, 9.17629535))
            ThreePointArc((-2.458780928, 9.17629535), (-1.751674147, 10.401040221), (-2.976419019, 11.108147002))
        make_face()
    extrude(amount=-CUT_EXTRUDE5_DEPTH, mode=Mode.SUBTRACT)


with BuildPart() as body_3_2:
    # Sketch16 → Boss-Extrude10 (new body)
    with BuildSketch(Plane(origin=(0, 0, -65), x_dir=(-1, 0, 0), z_dir=(0, 0, -1))):
        with BuildLine():
            Line((-4.5, 19.48717527), (-4.5, 15.48717527))
            Line((-4.5, 15.48717527), (4.5, 15.48717527))
            Line((4.5, 15.48717527), (4.5, 19.48717527))
            ThreePointArc((4.5, 19.48717527), (0, 20), (-4.5, 19.48717527))
        make_face()
    extrude(amount=BOSS_EXTRUDE10_DEPTH)


with BuildPart() as body_4:
    # Sketch16 → Boss-Extrude10 2 (new body)
    with BuildSketch(Plane(origin=(0, 0, -65), x_dir=(-1, 0, 0), z_dir=(0, 0, -1))):
        with BuildLine():
            Line((4.5, -19.48717527), (4.5, -15.48717527))
            Line((4.5, -15.48717527), (-4.5, -15.48717527))
            Line((-4.5, -15.48717527), (-4.5, -19.48717527))
            ThreePointArc((-4.5, -19.48717527), (0, -20), (4.5, -19.48717527))
        make_face()
    extrude(amount=BOSS_EXTRUDE10_2_DEPTH)


with BuildPart() as body_5:
    # Sketch17 → Boss-Extrude11 (new body)
    with BuildSketch(Plane(origin=(0, 0, -67), x_dir=(-1, 0, 0), z_dir=(0, 0, -1))):
        with Locations((0, 17.48717527)):
            Rectangle(SKETCH17_W, SKETCH17_H)
    extrude(amount=BOSS_EXTRUDE11_DEPTH)

    # Sketch18 → Cut-Extrude6 (cut)
    with BuildSketch(Plane.XZ.offset(-17.23717527)):
        with Locations(Location((-0.141118763, -71.883747027, 0), (0, 0, 270))):
            Circle(SKETCH18_R)
    extrude(amount=-CUT_EXTRUDE6_DEPTH, mode=Mode.SUBTRACT)


with BuildPart() as cirpattern2_1:
    # CirPattern2: pattern copy
    add(body_5.part.rotate(Axis((0, 0, 0), (0, 0, 1)), 1 * 360 / CIRPATTERN2_COUNT))


solid = Compound([body_2.part, part_1.part, body_3_2.part, body_4.part, body_5.part, cirpattern2_1.part])
